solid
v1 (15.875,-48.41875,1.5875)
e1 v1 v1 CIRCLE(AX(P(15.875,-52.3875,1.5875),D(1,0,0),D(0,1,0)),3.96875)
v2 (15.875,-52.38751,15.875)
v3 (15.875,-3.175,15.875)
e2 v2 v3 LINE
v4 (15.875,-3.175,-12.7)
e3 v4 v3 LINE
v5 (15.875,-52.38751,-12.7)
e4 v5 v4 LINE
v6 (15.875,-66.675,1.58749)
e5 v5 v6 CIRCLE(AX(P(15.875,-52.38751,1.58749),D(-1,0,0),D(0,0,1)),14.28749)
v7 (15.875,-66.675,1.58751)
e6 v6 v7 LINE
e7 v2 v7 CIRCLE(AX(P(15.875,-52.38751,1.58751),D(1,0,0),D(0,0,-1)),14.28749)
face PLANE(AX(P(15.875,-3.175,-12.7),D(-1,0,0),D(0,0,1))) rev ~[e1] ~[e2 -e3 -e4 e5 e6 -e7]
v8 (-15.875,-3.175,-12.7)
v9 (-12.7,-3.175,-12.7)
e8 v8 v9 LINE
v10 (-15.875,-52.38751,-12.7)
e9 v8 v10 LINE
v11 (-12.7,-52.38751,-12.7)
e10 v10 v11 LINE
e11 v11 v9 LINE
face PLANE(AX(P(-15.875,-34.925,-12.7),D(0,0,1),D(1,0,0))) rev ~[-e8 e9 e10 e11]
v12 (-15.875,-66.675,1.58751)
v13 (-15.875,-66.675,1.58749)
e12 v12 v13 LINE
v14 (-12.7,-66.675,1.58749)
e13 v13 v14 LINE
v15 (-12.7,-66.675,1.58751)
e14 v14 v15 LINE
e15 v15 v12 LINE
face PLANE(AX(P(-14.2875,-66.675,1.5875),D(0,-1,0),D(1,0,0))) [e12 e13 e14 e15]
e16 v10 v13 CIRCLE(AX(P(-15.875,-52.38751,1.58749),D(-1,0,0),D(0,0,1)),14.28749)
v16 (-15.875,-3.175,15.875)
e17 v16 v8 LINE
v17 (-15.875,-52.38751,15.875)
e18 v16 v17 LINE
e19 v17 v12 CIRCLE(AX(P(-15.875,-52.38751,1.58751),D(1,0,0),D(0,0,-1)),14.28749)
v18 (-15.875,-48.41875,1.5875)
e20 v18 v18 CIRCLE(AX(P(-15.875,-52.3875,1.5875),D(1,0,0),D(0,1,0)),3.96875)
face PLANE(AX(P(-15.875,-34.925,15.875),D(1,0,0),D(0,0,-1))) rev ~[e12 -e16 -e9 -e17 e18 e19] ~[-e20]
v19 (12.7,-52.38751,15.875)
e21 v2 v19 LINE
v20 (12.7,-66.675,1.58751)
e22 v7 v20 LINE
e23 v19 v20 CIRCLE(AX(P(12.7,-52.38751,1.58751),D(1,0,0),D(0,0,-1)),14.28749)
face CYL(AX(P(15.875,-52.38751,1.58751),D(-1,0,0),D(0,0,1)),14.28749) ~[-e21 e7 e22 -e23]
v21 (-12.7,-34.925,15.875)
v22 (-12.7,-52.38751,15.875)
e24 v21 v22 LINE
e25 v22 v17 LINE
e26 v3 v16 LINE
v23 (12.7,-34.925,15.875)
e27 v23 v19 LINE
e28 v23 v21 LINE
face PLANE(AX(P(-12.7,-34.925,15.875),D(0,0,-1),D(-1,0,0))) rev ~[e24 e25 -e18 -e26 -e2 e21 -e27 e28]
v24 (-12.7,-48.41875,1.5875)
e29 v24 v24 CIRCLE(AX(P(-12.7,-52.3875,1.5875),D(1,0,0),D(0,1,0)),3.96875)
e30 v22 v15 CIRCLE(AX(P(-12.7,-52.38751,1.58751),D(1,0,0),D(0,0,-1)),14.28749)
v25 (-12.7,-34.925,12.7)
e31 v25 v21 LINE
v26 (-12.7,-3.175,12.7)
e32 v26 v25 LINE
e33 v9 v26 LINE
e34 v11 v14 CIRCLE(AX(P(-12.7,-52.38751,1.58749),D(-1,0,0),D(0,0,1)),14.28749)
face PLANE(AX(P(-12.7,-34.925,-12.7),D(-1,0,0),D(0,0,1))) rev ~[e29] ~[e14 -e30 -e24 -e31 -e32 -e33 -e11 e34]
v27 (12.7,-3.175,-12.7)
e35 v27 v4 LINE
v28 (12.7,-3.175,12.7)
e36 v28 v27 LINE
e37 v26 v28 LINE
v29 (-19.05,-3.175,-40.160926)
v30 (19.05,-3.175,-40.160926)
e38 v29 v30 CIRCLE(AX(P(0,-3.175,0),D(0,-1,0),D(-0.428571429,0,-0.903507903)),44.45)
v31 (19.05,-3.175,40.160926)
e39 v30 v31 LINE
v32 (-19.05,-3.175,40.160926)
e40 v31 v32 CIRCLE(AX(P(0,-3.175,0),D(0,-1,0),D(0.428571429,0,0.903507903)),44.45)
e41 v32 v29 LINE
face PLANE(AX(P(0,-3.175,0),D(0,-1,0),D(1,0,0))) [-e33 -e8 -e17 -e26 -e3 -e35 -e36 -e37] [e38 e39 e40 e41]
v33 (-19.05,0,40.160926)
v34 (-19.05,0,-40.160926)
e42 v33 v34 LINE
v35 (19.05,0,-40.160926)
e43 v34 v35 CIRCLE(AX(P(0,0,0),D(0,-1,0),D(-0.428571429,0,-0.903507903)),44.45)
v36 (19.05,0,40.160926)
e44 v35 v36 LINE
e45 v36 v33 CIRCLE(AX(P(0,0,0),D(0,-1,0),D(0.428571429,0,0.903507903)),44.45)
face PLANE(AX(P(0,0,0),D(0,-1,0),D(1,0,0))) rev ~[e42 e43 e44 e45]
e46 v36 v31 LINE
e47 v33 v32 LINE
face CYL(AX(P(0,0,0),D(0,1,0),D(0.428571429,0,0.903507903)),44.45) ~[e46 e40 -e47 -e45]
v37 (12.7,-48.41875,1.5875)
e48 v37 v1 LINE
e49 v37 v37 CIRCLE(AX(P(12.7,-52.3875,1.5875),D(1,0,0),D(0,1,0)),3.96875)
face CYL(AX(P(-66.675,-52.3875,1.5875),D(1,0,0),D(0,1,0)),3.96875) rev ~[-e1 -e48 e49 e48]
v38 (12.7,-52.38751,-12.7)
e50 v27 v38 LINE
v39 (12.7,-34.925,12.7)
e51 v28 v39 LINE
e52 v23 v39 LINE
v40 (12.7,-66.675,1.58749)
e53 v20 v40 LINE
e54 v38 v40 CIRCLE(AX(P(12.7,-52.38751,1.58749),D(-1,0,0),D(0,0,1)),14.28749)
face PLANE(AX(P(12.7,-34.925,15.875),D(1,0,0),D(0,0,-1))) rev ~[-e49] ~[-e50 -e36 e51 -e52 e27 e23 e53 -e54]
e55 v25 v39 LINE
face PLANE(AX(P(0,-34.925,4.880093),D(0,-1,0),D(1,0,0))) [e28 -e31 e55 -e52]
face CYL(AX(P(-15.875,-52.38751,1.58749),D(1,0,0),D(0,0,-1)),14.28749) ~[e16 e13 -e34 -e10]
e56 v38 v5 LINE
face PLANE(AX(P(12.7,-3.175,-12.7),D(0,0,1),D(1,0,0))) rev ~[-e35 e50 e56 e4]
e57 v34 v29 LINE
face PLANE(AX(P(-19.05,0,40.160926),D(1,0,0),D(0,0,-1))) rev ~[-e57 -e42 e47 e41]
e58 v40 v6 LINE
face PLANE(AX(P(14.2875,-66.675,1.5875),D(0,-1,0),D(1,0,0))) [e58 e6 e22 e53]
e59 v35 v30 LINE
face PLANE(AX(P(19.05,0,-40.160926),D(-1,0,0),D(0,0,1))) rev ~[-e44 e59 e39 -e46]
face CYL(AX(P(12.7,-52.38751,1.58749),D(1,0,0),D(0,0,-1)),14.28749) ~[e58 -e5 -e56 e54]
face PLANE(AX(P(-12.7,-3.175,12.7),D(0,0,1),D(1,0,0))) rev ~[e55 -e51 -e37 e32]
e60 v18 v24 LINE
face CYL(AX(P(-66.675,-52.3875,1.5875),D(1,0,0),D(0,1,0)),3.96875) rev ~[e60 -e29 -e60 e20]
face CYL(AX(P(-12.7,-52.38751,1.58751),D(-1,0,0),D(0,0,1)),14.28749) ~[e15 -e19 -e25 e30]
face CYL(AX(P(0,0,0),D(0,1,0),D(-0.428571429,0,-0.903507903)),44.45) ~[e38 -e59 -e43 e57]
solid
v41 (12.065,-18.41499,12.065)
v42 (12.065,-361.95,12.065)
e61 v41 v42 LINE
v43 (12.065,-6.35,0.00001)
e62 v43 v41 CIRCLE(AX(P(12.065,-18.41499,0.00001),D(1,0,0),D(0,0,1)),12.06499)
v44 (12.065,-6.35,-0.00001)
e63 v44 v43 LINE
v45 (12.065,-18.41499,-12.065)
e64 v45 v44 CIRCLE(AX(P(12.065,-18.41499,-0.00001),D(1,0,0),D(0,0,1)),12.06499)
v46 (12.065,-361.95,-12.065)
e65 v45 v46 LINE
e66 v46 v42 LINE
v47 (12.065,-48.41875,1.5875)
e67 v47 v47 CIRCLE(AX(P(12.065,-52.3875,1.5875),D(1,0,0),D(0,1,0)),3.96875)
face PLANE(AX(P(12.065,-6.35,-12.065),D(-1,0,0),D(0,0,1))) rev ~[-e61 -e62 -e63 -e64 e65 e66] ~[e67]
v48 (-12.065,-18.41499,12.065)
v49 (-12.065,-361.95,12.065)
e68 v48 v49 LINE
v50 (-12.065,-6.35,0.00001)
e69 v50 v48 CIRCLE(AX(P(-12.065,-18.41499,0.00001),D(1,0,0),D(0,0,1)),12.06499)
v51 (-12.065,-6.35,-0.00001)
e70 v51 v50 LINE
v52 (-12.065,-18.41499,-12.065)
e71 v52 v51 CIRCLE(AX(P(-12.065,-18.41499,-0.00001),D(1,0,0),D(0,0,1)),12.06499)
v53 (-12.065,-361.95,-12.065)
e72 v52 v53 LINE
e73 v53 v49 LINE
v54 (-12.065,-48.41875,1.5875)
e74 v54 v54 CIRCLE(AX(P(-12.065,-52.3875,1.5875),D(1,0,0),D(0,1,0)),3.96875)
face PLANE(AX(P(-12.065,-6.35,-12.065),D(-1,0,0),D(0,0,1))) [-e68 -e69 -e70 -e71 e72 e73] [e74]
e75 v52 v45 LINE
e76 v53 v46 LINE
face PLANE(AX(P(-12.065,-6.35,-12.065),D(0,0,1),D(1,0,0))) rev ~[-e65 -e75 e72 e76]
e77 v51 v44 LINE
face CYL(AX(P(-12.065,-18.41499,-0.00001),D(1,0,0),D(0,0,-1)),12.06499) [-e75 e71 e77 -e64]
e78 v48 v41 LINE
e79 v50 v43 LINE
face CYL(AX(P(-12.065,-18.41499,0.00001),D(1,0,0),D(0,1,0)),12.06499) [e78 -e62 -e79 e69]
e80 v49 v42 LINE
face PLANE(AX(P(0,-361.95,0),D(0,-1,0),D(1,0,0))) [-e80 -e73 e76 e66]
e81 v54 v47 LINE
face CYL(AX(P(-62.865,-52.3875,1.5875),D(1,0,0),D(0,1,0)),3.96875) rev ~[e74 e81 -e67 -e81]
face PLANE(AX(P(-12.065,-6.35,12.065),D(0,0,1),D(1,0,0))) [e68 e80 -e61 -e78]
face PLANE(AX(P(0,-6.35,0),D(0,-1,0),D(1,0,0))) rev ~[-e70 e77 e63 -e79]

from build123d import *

# Parameters (mm, degrees)
F1_DEPTH  = 3.175
F3_DEPTH  = 31.75
F5_DEPTH  = 31.75
F6_R      = 14.28749
F8_D      = 7.9375
F8_DEPTH  = 50.8
F8_TIP    = 2.3846655818
F10_W     = 24.13
F10_H     = 24.13
F11_DEPTH = 355.6
F13_D     = 7.9375
F13_DEPTH = 50.8
F13_TIP   = 2.3846655818
F14_R     = 12.06499


# Not quite as in the source:
# - a fillet or chamfer is up to 0.001 mm smaller than in the source, because OpenCascade refuses the exact size


with BuildPart() as f1:
    # F0 (on Front) → F1 (new body)
    with BuildSketch(Plane.XZ):
        with BuildLine():
            Line((-19.05, 40.1609262841), (-19.05, -40.1609262841))
            ThreePointArc((-19.05, -40.1609262841), (0, -44.45), (19.05, -40.1609262841))
            Line((19.05, -40.1609262841), (19.05, 40.1609262841))
            ThreePointArc((19.05, 40.1609262841), (0, 44.45), (-19.05, 40.1609262841))
        make_face()
    extrude(amount=F1_DEPTH)

    # F2 (on face) → F3 (join)
    with BuildSketch(Plane.XZ.offset(3.175)):
        Polygon((-12.7, 12.7), (12.7, 12.7), (12.7, -12.7), (15.875, -12.7), (15.875, 15.875), (-15.875, 15.875), (-15.875, -12.7), (-12.7, -12.7), align=None)
    extrude(amount=F3_DEPTH)

    # F4 (on face) → F5 (join)
    with BuildSketch(Plane.XZ.offset(34.925)):
        Polygon((-12.7, 12.7), (-12.7, 15.875), (-15.875, 15.875), (-15.875, -12.7), (-12.7, -12.7), align=None)
        Polygon((15.875, 15.875), (12.7, 15.875), (12.7, 12.7), (12.7, -12.7), (15.875, -12.7), align=None)
    extrude(amount=F5_DEPTH)

    # F6 (radius 14.2875 in the source; OpenCascade refuses exactly that, so slightly less here)
    f6_edges = [f1.edges().sort_by_distance(p)[0] for p in [
        (-14.2875, -66.675, 15.875),
        (-14.2875, -66.675, -12.7),
        (14.2875, -66.675, -12.7),
        (14.2875, -66.675, 15.875),
    ]]
    fillet(f6_edges, radius=F6_R)

    # F8
    with Locations(Plane(origin=(-15.875, 0, 0), x_dir=(0, -1, 0), z_dir=(-1, 0, 0))):
        with Locations((52.3875, 1.5875)):
            Hole(F8_D / 2, depth=F8_DEPTH)
            with Locations((0, 0, -(F8_DEPTH + F8_TIP / 2))):  # 118° drill point
                Cone(0, F8_D / 2, F8_TIP, mode=Mode.SUBTRACT)


with BuildPart() as f11:
    # F10 (on offset) → F11 (new body)
    with BuildSketch(Plane.XZ.offset(6.35)):
        Rectangle(F10_W, F10_H)
    extrude(amount=F11_DEPTH)

    # F13
    with Locations(Plane(origin=(-12.065, 0, 0), x_dir=(0, -1, 0), z_dir=(-1, 0, 0))):
        with Locations((52.3875, 1.5875)):
            Hole(F13_D / 2, depth=F13_DEPTH)
            with Locations((0, 0, -(F13_DEPTH + F13_TIP / 2))):  # 118° drill point
                Cone(0, F13_D / 2, F13_TIP, mode=Mode.SUBTRACT)

    # F14 (radius 12.065 in the source; OpenCascade refuses exactly that, so slightly less here)
    f14_edges = [f11.edges().sort_by_distance(p)[0] for p in [
        (0, -6.35, 12.065),
        (0, -6.35, -12.065),
    ]]
    fillet(f14_edges, radius=F14_R)


solid = Compound([f1.part, f11.part])
